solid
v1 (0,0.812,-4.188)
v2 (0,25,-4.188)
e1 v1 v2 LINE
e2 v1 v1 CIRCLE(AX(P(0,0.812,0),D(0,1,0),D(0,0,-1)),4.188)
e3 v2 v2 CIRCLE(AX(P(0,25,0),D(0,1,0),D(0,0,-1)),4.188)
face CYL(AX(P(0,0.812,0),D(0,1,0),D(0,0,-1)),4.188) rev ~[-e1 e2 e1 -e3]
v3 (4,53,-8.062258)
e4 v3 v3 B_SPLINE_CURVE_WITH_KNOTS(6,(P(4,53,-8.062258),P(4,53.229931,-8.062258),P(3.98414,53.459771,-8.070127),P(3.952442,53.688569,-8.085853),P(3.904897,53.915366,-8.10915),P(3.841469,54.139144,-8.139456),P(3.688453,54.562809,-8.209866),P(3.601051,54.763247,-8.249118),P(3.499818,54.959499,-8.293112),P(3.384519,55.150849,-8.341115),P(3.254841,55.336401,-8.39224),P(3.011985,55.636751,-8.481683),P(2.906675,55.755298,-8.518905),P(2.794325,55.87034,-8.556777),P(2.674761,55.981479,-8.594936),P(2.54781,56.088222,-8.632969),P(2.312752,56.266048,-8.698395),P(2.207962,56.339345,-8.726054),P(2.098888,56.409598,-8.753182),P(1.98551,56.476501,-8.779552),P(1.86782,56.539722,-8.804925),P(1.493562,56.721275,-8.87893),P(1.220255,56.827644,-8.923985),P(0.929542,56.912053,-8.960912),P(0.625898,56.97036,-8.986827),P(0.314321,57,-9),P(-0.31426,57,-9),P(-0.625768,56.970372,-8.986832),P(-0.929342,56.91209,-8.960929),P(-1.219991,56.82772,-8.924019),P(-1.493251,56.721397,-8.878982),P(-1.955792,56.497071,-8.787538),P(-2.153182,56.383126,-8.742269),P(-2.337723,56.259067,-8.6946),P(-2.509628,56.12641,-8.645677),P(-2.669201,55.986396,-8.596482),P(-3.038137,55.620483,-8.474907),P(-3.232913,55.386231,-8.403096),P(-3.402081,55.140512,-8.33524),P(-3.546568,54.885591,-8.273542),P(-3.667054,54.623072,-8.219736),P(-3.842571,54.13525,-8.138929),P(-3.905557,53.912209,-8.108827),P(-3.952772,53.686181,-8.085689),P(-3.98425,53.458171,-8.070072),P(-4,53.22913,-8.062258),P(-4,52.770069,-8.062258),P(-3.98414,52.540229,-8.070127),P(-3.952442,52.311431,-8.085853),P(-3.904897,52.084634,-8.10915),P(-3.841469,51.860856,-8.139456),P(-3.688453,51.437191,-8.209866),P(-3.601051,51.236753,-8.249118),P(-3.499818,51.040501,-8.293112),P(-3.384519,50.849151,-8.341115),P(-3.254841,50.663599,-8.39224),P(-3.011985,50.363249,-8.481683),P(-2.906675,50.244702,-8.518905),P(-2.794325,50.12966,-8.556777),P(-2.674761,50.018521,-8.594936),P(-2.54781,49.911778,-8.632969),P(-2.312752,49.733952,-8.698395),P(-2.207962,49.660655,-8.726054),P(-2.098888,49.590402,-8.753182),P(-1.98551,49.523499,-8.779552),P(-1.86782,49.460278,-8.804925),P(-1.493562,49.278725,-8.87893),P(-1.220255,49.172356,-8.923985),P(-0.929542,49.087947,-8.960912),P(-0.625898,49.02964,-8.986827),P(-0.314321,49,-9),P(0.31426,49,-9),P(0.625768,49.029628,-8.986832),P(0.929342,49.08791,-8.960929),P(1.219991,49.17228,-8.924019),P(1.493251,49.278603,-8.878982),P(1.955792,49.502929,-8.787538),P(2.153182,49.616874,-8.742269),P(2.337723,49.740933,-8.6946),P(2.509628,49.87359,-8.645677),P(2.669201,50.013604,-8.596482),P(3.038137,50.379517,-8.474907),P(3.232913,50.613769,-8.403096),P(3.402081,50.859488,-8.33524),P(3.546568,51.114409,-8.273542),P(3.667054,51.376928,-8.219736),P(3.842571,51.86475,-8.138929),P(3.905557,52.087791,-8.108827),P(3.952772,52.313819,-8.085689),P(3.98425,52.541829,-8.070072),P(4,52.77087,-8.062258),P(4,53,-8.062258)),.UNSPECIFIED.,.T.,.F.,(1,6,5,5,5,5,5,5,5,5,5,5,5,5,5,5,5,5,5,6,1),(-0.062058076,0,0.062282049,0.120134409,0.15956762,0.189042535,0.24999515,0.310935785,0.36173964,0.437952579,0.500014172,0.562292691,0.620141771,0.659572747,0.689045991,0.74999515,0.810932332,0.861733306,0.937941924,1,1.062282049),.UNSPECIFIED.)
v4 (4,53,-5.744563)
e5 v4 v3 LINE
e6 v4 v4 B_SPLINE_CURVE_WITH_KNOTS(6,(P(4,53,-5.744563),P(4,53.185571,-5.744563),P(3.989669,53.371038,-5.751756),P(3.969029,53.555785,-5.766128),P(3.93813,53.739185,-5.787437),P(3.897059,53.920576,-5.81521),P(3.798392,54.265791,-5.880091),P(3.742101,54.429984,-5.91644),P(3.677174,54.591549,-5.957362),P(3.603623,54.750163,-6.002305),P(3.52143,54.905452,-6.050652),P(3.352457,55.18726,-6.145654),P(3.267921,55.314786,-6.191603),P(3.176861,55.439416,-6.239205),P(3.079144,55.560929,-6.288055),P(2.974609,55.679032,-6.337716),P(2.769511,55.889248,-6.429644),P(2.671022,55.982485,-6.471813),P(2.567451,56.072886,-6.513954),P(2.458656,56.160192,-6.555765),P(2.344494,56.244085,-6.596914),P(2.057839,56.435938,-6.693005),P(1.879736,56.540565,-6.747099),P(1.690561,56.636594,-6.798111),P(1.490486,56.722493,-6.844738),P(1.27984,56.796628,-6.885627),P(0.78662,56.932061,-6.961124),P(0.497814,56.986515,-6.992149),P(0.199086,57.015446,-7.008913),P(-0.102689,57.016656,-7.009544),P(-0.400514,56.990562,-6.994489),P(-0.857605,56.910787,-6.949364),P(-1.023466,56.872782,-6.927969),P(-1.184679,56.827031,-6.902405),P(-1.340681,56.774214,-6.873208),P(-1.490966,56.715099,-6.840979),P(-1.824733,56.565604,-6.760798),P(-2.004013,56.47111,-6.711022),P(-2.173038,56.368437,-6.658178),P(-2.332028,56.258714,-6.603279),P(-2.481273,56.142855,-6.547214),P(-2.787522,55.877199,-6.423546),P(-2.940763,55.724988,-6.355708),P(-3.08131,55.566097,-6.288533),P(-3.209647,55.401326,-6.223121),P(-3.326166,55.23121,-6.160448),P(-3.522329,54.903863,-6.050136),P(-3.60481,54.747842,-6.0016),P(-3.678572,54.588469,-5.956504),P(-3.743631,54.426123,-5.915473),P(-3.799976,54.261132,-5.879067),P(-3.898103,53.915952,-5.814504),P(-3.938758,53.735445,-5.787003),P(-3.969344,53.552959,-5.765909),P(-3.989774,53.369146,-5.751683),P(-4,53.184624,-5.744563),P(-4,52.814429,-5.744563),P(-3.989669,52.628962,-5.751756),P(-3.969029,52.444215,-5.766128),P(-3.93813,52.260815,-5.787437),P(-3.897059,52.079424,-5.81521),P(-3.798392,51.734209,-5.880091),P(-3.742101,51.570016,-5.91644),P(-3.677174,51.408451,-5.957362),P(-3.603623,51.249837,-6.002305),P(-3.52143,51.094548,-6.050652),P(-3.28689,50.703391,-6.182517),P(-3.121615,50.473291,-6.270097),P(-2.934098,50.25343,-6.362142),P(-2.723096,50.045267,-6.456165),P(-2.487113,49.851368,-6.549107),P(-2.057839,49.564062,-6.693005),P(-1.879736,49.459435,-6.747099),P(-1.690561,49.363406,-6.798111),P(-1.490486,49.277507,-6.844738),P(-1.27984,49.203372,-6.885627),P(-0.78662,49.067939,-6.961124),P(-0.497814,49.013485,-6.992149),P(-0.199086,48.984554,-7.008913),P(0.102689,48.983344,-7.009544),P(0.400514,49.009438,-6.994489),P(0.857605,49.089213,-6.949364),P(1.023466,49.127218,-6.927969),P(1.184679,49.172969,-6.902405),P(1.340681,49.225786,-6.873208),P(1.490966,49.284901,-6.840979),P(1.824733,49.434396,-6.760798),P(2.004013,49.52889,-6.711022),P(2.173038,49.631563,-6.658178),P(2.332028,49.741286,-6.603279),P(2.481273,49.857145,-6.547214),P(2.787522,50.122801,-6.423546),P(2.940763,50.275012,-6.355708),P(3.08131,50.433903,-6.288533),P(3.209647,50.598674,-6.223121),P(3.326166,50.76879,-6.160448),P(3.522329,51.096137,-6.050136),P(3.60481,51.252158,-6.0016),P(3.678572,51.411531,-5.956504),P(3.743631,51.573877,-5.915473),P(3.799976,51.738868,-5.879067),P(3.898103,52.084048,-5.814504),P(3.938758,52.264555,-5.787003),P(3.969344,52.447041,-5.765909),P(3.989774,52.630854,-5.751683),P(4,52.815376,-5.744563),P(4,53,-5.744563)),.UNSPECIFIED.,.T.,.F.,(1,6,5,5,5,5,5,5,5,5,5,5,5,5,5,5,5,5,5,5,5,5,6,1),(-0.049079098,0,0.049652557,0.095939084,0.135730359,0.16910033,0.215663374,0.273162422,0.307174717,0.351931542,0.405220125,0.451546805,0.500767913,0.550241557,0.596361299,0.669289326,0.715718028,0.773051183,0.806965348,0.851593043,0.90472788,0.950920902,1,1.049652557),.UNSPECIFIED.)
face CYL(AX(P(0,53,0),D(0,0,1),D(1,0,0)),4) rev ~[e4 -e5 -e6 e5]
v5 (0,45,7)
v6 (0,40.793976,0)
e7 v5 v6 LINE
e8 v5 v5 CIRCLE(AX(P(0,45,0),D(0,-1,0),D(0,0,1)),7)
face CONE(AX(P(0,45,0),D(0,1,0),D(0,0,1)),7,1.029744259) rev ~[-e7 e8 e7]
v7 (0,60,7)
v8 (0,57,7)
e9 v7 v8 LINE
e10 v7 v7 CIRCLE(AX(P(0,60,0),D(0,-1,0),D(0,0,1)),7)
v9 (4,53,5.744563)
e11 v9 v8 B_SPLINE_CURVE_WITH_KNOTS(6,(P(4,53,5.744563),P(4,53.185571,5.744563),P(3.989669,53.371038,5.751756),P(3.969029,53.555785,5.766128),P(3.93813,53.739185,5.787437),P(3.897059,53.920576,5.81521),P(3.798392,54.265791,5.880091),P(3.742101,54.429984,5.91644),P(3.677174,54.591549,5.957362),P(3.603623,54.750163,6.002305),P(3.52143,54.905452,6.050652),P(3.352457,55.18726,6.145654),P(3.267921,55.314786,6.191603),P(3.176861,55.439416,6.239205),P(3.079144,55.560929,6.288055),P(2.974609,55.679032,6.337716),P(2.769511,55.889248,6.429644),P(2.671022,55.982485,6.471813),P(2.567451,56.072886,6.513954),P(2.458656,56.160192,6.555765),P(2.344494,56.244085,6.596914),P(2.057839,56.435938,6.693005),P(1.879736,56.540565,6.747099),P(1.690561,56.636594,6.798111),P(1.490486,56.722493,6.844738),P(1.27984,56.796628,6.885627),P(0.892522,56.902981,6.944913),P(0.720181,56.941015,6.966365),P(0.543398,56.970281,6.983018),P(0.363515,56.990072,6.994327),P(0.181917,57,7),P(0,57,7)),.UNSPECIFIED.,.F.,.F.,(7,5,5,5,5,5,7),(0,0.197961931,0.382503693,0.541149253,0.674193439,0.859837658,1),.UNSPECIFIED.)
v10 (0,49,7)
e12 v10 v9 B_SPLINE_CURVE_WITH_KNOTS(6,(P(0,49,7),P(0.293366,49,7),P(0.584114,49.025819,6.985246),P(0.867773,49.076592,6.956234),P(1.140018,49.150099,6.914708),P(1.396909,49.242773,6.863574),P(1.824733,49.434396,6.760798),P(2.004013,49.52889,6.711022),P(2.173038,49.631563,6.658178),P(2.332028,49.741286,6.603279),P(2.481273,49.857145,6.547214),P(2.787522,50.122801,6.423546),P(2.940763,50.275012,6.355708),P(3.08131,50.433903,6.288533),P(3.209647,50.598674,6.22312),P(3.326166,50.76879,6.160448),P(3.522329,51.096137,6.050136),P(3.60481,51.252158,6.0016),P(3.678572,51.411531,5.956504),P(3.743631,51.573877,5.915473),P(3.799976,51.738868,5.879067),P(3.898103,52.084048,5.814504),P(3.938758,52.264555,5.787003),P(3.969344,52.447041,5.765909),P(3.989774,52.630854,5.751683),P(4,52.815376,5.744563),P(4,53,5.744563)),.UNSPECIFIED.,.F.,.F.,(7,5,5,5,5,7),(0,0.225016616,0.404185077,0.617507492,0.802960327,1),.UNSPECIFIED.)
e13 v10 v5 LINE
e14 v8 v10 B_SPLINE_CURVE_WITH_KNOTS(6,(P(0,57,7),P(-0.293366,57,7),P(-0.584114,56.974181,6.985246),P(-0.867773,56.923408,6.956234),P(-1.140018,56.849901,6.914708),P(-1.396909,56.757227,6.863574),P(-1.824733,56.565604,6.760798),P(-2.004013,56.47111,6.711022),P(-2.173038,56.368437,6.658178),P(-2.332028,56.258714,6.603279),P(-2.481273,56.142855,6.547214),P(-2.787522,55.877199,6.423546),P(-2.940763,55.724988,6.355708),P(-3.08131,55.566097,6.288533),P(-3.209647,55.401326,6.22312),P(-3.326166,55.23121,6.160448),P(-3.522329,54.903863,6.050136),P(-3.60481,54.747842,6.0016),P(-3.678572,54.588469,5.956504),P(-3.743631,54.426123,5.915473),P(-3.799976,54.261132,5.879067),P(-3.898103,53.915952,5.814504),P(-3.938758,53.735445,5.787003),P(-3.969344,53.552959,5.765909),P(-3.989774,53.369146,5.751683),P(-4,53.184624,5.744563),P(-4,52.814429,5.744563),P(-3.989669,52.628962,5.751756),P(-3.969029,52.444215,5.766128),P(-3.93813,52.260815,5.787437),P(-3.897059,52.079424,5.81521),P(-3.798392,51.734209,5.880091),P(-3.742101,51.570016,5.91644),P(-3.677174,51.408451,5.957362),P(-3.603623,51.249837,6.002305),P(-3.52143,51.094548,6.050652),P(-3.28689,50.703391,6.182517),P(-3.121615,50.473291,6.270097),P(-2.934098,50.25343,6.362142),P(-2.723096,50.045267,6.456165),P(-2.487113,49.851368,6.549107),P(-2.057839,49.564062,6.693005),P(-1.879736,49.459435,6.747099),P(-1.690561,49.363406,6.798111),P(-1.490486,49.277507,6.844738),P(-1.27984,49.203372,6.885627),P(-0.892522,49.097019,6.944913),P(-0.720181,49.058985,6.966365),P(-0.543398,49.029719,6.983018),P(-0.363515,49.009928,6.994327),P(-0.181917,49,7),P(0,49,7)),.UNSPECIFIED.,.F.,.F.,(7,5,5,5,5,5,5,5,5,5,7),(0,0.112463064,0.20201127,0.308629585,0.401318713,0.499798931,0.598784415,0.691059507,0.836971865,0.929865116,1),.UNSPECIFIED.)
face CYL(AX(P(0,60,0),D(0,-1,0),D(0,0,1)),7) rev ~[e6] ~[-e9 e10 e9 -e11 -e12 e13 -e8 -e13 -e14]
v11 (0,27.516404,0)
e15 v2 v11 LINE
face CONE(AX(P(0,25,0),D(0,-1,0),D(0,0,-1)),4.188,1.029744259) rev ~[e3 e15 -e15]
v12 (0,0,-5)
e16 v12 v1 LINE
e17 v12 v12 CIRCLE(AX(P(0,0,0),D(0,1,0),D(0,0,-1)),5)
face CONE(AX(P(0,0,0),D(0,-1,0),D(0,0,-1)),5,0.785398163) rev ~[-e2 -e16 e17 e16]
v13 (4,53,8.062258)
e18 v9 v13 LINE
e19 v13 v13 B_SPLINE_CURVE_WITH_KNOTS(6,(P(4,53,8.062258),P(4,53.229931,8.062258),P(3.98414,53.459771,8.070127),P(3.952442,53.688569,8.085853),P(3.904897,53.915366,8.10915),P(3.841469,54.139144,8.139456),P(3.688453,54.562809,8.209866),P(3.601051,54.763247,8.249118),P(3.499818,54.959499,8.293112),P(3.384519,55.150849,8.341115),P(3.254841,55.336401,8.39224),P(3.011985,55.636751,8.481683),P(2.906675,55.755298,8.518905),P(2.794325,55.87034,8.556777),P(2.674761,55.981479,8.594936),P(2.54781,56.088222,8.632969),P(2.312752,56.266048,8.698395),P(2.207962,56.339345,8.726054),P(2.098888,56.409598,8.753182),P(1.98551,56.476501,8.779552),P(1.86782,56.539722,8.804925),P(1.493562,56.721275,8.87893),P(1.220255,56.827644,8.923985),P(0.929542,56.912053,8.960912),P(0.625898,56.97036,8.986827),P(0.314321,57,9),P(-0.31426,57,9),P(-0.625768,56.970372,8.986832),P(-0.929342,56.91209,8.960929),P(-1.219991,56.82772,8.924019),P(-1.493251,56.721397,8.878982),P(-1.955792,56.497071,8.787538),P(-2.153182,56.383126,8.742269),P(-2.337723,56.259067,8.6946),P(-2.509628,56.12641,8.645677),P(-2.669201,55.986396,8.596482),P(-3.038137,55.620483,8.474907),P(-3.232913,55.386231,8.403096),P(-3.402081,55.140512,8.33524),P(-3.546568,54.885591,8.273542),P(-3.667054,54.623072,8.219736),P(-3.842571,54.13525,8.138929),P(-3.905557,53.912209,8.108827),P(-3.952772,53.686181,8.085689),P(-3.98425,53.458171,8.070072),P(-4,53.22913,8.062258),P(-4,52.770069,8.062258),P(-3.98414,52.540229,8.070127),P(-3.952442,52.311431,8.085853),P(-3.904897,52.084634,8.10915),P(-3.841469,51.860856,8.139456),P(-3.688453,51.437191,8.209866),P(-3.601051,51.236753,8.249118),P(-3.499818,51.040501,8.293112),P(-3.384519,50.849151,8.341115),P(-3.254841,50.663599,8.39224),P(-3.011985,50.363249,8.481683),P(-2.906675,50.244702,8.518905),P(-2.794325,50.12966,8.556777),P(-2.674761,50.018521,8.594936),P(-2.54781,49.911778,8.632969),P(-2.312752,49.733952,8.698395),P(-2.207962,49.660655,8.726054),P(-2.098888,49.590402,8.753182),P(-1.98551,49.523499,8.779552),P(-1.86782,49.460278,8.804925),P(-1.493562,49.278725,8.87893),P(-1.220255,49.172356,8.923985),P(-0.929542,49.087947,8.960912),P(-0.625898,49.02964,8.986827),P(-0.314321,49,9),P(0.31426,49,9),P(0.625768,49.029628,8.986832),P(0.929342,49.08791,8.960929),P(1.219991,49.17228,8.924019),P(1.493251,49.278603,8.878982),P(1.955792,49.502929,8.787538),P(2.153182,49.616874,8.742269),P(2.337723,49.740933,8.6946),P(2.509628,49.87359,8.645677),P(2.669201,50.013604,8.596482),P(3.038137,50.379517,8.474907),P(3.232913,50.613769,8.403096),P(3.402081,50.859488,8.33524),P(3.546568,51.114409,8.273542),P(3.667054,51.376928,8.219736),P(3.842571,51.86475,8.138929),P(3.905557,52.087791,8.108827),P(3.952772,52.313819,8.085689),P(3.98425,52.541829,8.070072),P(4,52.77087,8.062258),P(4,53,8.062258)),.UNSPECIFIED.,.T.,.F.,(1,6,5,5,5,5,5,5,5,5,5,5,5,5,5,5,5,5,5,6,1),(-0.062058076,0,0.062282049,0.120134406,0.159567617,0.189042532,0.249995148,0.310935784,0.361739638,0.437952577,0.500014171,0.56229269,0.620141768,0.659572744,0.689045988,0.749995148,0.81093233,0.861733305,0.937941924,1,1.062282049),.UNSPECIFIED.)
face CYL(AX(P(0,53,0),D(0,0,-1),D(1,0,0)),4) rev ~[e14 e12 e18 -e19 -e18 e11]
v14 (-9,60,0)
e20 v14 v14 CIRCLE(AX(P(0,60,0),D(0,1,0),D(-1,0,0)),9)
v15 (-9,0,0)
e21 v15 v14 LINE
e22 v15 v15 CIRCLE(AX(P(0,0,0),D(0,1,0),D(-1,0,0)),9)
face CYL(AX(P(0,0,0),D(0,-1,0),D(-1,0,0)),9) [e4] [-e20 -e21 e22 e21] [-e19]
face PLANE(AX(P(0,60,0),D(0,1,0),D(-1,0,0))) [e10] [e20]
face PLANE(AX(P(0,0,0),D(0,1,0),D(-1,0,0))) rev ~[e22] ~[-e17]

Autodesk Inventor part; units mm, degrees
ref_plane "YZ Plane" through (0, 0, 0) normal (1, 0, 0) x (0, 1, 0)
ref_plane "XZ Plane" through (0, 0, 0) normal (0, 1, 0) x (-1, 0, 0)
ref_plane "XY Plane" through (0, 0, 0) normal (0, 0, 1) x (1, 0, 0)
sketch "Sketch2" plane through (0, 0, 0) normal (0, 1, 0) x (-1, 0, 0)
  circle A0 centre (0, 0) radius 9
  dimension "d2" = 18
extrude "Extrusion2" add sketch "Sketch2" along normal blind 60
hole "Hole1" at (0, 0, 0) direction (0, 1, 0) diameter 8.376 depth 25 tip angle 118 countersink diameter 10 countersink angle 90 thread size "M10x1.5" class "6H" standard "ISO Metric profile"
sketch "Sketch3" plane through (0, 60, 0) normal (0, 1, 0) x (1, 0, 0)
  point P0 (0, 0)
  point P1 (0, 0)
hole "Hole2" at (0, 60, 0) direction (0, -1, 0) diameter 14 depth 15 tip angle 118
sketch "Sketch4" plane through (0, 0, 0) normal (0, 0, 1) x (1, 0, 0)
  circle A0 centre (0, 53) radius 4
  line L0 (9, 60) -> (-9, 60) projected
  point P0 (0, 0)
  point P1 (0, 60)
  dimension "d20" = 8
  dimension "d21" = 7
extrude "Extrusion3" cut sketch "Sketch4" along normal through all both and the other way through all
sketch "Sketch5" plane through (0, 0, 0) normal (0, -1, 0) x (1, 0, 0)
  circle A0 centre (0, 0) radius 9 projected
  line L0 (9, 0) -> (-9, 0)
  line L1 (-9, 0) -> (-9, -9)
  line L2 (-9, -9) -> (9, -9)
  line L3 (9, -9) -> (9, 0)
  dimension "d24" = 18
  dimension "d25" = 9
  dimension "d26" = 9
extrude "Extrusion4" [suppressed]
properties part number "RS-STT-103" material "11 110 (1.0721)"
